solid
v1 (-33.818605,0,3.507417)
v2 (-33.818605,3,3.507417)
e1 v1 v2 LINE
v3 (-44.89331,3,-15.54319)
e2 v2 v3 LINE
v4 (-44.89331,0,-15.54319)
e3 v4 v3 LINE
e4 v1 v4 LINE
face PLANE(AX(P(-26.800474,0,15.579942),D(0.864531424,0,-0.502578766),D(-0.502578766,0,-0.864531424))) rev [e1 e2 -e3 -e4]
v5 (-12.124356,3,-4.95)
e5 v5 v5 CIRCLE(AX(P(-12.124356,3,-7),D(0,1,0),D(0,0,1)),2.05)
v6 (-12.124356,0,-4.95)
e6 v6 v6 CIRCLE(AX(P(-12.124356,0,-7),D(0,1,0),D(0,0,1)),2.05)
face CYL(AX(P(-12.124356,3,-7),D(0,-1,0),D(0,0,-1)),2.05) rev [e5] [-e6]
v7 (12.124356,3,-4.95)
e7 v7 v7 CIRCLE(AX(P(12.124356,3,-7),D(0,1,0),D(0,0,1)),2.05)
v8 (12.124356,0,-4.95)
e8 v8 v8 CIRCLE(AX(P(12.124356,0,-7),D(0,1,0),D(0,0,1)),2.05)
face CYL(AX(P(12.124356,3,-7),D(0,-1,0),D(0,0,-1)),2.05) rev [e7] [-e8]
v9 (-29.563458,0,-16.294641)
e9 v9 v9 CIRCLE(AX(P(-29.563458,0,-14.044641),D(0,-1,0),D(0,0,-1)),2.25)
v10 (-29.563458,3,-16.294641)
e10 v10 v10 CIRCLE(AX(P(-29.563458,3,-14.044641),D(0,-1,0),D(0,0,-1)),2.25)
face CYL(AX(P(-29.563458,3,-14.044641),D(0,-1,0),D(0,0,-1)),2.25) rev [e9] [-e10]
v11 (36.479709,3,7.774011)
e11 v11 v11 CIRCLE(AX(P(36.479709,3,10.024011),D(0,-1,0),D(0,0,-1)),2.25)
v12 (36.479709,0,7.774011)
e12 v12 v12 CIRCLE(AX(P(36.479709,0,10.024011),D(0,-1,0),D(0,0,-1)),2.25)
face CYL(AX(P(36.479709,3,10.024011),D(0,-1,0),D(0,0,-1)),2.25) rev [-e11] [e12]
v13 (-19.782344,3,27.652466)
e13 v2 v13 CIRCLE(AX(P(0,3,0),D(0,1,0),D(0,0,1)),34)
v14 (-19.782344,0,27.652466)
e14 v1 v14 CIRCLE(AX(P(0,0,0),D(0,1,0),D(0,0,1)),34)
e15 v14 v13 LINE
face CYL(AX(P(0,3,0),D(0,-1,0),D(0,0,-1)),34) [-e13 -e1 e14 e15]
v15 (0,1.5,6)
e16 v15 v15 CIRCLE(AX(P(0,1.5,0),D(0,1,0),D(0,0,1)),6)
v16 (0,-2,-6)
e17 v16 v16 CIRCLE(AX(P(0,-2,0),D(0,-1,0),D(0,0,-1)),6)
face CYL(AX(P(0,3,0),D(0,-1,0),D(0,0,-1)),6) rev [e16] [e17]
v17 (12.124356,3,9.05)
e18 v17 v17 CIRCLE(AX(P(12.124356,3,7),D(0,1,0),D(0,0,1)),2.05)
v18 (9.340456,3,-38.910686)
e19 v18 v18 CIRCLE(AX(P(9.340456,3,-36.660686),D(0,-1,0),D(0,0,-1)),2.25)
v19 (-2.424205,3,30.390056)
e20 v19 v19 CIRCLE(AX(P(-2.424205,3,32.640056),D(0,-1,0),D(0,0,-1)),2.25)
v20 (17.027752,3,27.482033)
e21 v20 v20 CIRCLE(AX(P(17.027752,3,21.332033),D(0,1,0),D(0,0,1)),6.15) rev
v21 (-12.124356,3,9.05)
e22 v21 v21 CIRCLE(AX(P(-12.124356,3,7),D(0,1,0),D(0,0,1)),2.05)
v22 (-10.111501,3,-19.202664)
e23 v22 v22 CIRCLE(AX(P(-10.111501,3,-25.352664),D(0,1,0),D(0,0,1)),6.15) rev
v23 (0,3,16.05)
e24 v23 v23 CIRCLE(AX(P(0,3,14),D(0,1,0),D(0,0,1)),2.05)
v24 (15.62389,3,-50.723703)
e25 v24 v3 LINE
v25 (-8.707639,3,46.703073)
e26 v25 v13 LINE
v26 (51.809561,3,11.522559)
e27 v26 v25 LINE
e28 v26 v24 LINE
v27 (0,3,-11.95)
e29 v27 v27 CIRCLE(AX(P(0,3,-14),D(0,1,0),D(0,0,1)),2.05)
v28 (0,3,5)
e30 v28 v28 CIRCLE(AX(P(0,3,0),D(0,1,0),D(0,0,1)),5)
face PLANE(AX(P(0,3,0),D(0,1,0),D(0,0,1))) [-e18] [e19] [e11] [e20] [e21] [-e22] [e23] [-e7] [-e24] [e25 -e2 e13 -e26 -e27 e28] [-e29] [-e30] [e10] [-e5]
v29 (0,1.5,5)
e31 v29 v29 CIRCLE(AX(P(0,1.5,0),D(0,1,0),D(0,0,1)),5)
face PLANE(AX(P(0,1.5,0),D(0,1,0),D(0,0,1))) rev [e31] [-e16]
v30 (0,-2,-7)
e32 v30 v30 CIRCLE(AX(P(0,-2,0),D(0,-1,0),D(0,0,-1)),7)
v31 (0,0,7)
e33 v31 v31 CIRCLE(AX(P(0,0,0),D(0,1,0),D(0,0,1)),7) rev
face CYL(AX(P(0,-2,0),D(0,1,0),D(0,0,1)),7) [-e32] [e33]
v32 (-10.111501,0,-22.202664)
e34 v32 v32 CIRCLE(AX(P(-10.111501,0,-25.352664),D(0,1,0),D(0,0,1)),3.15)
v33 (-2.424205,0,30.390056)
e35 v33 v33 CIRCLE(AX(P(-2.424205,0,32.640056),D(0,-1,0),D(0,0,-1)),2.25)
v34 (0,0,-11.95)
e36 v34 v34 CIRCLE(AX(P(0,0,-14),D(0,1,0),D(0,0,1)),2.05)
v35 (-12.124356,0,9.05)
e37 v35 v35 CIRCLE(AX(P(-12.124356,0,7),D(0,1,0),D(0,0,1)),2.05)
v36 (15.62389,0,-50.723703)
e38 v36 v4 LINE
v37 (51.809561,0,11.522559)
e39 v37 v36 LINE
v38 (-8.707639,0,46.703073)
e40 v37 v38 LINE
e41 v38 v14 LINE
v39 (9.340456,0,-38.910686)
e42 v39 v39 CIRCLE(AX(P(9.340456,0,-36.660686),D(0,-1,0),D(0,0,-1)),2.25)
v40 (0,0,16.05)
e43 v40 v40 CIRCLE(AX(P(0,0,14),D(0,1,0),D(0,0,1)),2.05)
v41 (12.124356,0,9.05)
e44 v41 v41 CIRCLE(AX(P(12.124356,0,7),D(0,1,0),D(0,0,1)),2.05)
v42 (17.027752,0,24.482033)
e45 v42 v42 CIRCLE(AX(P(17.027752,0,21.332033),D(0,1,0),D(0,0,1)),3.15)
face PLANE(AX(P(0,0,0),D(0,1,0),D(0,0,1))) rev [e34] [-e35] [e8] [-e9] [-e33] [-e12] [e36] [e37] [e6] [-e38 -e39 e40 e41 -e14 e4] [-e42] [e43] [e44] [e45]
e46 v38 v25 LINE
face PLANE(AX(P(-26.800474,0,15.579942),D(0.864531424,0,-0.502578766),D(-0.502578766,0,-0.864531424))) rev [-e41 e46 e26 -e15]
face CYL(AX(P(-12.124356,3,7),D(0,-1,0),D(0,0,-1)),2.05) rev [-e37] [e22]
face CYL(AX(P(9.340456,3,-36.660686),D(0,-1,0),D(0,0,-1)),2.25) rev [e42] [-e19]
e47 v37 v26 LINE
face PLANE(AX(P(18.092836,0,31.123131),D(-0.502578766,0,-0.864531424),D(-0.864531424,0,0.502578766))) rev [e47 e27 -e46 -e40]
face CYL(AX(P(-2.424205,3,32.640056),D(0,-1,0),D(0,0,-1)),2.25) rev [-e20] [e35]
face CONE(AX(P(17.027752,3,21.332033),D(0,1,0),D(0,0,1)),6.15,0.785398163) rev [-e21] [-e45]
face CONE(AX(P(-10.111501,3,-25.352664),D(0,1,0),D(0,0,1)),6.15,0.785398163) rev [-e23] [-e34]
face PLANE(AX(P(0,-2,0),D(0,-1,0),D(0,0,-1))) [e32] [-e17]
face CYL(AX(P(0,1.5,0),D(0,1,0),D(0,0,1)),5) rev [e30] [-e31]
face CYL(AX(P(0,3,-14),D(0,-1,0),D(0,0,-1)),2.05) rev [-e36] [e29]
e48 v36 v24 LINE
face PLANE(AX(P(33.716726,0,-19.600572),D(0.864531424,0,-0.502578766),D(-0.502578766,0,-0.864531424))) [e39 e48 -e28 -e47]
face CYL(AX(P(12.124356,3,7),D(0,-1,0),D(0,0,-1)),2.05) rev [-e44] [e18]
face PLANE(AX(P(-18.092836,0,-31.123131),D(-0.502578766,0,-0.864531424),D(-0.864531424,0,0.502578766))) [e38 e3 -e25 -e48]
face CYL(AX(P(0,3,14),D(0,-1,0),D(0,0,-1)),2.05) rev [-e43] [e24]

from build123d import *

# Parameters (mm, degrees)
SKETCH_1_R          = 34
SKETCH_1_R_2        = 2.05
SKETCH_1_R_3        = 6
EXTRUDE_1_DEPTH     = 3
SKETCH_5_R          = 6.5
SKETCH_5_R_2        = 5
EXTRUDE_4_DEPTH     = 1.5
EXTRUDE_START       = 2
SKETCH_6_R          = 7
SKETCH_6_R_2        = 6
EXTRUDE_5_DEPTH     = 2
EXTRUDE_START_2     = -3
EXTRUDE_6_DEPTH     = 3
SKETCH_9_R          = 2.25
SKETCH_9_R_2        = 3.05
CUT_EXTRUDE_1_DEPTH = 3
CHAMFER_2_SIZE      = 3.1


with BuildPart() as part:
    # 草图1 → 凸台-拉伸1 (new body)
    with BuildSketch(Plane(origin=(0, 0, 0), x_dir=(1, 0, 0), z_dir=(0, 1, 0))):
        with Locations(Location((0, 0, 0), (0, 0, 270))):
            Circle(SKETCH_1_R)
        with Locations(Location((0, 14, 0), (0, 0, 270))):
            Circle(SKETCH_1_R_2, mode=Mode.SUBTRACT)
        with Locations(Location((12.124355653, 7, 0), (0, 0, 270))):
            Circle(SKETCH_1_R_2, mode=Mode.SUBTRACT)
        with Locations(Location((12.124355653, -7, 0), (0, 0, 270))):
            Circle(SKETCH_1_R_2, mode=Mode.SUBTRACT)
        with Locations(Location((0, -14, 0), (0, 0, 270))):
            Circle(SKETCH_1_R_2, mode=Mode.SUBTRACT)
        with Locations(Location((-12.124355653, -7, 0), (0, 0, 270))):
            Circle(SKETCH_1_R_2, mode=Mode.SUBTRACT)
        with Locations(Location((-12.124355653, 7, 0), (0, 0, 270))):
            Circle(SKETCH_1_R_2, mode=Mode.SUBTRACT)
        with Locations(Location((0, 0, 0), (0, 0, 270))):
            Circle(SKETCH_1_R_3, mode=Mode.SUBTRACT)
    extrude(amount=EXTRUDE_1_DEPTH)

    # 草图5 → 凸台-拉伸4 (add)
    with BuildSketch(Plane(origin=(0, 3, 0), x_dir=(1, 0, 0), z_dir=(0, 1, 0))):
        Circle(SKETCH_5_R)
        with Locations(Location((0, 0, 0), (0, 0, 270))):
            Circle(SKETCH_5_R_2, mode=Mode.SUBTRACT)
    extrude(amount=-EXTRUDE_4_DEPTH)

    # 草图6 → 凸台-拉伸5 (add)
    with BuildSketch(Plane(origin=(0, 0, 0), x_dir=(-1, 0, 0), z_dir=(0, -1, 0)).offset(EXTRUDE_START)):
        with Locations(Location((0, 0, 0), (0, 0, 270))):
            Circle(SKETCH_6_R)
        with Locations(Location((0, 0, 0), (0, 0, 90))):
            Circle(SKETCH_6_R_2, mode=Mode.SUBTRACT)
    extrude(amount=-EXTRUDE_5_DEPTH)

    # 草图8 → 凸台-拉伸6 (add)
    with BuildSketch(Plane(origin=(0, 3, 0), x_dir=(1, 0, 0), z_dir=(0, 1, 0)).offset(EXTRUDE_START_2)):
        with BuildLine():
            Line((-8.707638575, -46.70307303), (51.809561134, -11.522559398))
            Line((51.809561134, -11.522559398), (15.62388997, 50.723703159))
            Line((15.62388997, 50.723703159), (-44.893309739, 15.543189527))
            Line((-44.893309739, 15.543189527), (-33.818604688, -3.507417415))
            ThreePointArc((-33.818604688, -3.507417415), (-1.756052475, 33.954620889), (34, 0))
            ThreePointArc((34, 0), (15.546708924, -30.237391449), (-19.782343625, -27.652466087))
            Line((-19.782343625, -27.652466087), (-8.707638575, -46.70307303))
        make_face()
    extrude(amount=EXTRUDE_6_DEPTH)

    # 草图9 → 切除-拉伸1 (cut)
    with BuildSketch(Plane(origin=(0, 0, 0), x_dir=(-1, 0, 0), z_dir=(0, -1, 0))):
        with Locations(Location((-9.34045606, 36.660685763, 0), (0, 0, 90))):
            Circle(SKETCH_9_R)
        with Locations(Location((-36.479709434, -10.024011156, 0), (0, 0, 90))):
            Circle(SKETCH_9_R)
        with Locations(Location((29.563458038, 14.044641285, 0), (0, 0, 90))):
            Circle(SKETCH_9_R)
        with Locations(Location((2.424204665, -32.640055633, 0), (0, 0, 90))):
            Circle(SKETCH_9_R)
        with Locations(Location((10.111500989, 25.352663524, 0), (0, 0, 90))):
            Circle(SKETCH_9_R_2)
        with Locations(Location((-17.027752384, -21.332033394, 0), (0, 0, 90))):
            Circle(SKETCH_9_R_2)
    extrude(amount=-CUT_EXTRUDE_1_DEPTH, mode=Mode.SUBTRACT)

    # 倒角2
    # the kernel refuses this chamfer: 3.1 mm, written as the material it takes off along each edge
    with BuildSketch(Plane(origin=(17.027752384, 3, 21.332033394), x_dir=(0, 0, -1), z_dir=(-1, 0, 0))) as chamfer_2_piece_1:
        Polygon((3.05 + CHAMFER_2_SIZE, 0), (3.05, CHAMFER_2_SIZE), (3.05, 0), align=None)
    revolve(axis=Axis((17.027752384, 3, 21.332033394), (0, -1, 0)), mode=Mode.SUBTRACT)
    with BuildSketch(Plane(origin=(-10.111500989, 3, -25.352663524), x_dir=(0, 0, -1), z_dir=(-1, 0, 0))) as chamfer_2_piece_2:
        Polygon((3.05 + CHAMFER_2_SIZE, 0), (3.05, CHAMFER_2_SIZE), (3.05, 0), align=None)
    revolve(axis=Axis((-10.111500989, 3, -25.352663524), (0, -1, 0)), mode=Mode.SUBTRACT)


solid = part.part
